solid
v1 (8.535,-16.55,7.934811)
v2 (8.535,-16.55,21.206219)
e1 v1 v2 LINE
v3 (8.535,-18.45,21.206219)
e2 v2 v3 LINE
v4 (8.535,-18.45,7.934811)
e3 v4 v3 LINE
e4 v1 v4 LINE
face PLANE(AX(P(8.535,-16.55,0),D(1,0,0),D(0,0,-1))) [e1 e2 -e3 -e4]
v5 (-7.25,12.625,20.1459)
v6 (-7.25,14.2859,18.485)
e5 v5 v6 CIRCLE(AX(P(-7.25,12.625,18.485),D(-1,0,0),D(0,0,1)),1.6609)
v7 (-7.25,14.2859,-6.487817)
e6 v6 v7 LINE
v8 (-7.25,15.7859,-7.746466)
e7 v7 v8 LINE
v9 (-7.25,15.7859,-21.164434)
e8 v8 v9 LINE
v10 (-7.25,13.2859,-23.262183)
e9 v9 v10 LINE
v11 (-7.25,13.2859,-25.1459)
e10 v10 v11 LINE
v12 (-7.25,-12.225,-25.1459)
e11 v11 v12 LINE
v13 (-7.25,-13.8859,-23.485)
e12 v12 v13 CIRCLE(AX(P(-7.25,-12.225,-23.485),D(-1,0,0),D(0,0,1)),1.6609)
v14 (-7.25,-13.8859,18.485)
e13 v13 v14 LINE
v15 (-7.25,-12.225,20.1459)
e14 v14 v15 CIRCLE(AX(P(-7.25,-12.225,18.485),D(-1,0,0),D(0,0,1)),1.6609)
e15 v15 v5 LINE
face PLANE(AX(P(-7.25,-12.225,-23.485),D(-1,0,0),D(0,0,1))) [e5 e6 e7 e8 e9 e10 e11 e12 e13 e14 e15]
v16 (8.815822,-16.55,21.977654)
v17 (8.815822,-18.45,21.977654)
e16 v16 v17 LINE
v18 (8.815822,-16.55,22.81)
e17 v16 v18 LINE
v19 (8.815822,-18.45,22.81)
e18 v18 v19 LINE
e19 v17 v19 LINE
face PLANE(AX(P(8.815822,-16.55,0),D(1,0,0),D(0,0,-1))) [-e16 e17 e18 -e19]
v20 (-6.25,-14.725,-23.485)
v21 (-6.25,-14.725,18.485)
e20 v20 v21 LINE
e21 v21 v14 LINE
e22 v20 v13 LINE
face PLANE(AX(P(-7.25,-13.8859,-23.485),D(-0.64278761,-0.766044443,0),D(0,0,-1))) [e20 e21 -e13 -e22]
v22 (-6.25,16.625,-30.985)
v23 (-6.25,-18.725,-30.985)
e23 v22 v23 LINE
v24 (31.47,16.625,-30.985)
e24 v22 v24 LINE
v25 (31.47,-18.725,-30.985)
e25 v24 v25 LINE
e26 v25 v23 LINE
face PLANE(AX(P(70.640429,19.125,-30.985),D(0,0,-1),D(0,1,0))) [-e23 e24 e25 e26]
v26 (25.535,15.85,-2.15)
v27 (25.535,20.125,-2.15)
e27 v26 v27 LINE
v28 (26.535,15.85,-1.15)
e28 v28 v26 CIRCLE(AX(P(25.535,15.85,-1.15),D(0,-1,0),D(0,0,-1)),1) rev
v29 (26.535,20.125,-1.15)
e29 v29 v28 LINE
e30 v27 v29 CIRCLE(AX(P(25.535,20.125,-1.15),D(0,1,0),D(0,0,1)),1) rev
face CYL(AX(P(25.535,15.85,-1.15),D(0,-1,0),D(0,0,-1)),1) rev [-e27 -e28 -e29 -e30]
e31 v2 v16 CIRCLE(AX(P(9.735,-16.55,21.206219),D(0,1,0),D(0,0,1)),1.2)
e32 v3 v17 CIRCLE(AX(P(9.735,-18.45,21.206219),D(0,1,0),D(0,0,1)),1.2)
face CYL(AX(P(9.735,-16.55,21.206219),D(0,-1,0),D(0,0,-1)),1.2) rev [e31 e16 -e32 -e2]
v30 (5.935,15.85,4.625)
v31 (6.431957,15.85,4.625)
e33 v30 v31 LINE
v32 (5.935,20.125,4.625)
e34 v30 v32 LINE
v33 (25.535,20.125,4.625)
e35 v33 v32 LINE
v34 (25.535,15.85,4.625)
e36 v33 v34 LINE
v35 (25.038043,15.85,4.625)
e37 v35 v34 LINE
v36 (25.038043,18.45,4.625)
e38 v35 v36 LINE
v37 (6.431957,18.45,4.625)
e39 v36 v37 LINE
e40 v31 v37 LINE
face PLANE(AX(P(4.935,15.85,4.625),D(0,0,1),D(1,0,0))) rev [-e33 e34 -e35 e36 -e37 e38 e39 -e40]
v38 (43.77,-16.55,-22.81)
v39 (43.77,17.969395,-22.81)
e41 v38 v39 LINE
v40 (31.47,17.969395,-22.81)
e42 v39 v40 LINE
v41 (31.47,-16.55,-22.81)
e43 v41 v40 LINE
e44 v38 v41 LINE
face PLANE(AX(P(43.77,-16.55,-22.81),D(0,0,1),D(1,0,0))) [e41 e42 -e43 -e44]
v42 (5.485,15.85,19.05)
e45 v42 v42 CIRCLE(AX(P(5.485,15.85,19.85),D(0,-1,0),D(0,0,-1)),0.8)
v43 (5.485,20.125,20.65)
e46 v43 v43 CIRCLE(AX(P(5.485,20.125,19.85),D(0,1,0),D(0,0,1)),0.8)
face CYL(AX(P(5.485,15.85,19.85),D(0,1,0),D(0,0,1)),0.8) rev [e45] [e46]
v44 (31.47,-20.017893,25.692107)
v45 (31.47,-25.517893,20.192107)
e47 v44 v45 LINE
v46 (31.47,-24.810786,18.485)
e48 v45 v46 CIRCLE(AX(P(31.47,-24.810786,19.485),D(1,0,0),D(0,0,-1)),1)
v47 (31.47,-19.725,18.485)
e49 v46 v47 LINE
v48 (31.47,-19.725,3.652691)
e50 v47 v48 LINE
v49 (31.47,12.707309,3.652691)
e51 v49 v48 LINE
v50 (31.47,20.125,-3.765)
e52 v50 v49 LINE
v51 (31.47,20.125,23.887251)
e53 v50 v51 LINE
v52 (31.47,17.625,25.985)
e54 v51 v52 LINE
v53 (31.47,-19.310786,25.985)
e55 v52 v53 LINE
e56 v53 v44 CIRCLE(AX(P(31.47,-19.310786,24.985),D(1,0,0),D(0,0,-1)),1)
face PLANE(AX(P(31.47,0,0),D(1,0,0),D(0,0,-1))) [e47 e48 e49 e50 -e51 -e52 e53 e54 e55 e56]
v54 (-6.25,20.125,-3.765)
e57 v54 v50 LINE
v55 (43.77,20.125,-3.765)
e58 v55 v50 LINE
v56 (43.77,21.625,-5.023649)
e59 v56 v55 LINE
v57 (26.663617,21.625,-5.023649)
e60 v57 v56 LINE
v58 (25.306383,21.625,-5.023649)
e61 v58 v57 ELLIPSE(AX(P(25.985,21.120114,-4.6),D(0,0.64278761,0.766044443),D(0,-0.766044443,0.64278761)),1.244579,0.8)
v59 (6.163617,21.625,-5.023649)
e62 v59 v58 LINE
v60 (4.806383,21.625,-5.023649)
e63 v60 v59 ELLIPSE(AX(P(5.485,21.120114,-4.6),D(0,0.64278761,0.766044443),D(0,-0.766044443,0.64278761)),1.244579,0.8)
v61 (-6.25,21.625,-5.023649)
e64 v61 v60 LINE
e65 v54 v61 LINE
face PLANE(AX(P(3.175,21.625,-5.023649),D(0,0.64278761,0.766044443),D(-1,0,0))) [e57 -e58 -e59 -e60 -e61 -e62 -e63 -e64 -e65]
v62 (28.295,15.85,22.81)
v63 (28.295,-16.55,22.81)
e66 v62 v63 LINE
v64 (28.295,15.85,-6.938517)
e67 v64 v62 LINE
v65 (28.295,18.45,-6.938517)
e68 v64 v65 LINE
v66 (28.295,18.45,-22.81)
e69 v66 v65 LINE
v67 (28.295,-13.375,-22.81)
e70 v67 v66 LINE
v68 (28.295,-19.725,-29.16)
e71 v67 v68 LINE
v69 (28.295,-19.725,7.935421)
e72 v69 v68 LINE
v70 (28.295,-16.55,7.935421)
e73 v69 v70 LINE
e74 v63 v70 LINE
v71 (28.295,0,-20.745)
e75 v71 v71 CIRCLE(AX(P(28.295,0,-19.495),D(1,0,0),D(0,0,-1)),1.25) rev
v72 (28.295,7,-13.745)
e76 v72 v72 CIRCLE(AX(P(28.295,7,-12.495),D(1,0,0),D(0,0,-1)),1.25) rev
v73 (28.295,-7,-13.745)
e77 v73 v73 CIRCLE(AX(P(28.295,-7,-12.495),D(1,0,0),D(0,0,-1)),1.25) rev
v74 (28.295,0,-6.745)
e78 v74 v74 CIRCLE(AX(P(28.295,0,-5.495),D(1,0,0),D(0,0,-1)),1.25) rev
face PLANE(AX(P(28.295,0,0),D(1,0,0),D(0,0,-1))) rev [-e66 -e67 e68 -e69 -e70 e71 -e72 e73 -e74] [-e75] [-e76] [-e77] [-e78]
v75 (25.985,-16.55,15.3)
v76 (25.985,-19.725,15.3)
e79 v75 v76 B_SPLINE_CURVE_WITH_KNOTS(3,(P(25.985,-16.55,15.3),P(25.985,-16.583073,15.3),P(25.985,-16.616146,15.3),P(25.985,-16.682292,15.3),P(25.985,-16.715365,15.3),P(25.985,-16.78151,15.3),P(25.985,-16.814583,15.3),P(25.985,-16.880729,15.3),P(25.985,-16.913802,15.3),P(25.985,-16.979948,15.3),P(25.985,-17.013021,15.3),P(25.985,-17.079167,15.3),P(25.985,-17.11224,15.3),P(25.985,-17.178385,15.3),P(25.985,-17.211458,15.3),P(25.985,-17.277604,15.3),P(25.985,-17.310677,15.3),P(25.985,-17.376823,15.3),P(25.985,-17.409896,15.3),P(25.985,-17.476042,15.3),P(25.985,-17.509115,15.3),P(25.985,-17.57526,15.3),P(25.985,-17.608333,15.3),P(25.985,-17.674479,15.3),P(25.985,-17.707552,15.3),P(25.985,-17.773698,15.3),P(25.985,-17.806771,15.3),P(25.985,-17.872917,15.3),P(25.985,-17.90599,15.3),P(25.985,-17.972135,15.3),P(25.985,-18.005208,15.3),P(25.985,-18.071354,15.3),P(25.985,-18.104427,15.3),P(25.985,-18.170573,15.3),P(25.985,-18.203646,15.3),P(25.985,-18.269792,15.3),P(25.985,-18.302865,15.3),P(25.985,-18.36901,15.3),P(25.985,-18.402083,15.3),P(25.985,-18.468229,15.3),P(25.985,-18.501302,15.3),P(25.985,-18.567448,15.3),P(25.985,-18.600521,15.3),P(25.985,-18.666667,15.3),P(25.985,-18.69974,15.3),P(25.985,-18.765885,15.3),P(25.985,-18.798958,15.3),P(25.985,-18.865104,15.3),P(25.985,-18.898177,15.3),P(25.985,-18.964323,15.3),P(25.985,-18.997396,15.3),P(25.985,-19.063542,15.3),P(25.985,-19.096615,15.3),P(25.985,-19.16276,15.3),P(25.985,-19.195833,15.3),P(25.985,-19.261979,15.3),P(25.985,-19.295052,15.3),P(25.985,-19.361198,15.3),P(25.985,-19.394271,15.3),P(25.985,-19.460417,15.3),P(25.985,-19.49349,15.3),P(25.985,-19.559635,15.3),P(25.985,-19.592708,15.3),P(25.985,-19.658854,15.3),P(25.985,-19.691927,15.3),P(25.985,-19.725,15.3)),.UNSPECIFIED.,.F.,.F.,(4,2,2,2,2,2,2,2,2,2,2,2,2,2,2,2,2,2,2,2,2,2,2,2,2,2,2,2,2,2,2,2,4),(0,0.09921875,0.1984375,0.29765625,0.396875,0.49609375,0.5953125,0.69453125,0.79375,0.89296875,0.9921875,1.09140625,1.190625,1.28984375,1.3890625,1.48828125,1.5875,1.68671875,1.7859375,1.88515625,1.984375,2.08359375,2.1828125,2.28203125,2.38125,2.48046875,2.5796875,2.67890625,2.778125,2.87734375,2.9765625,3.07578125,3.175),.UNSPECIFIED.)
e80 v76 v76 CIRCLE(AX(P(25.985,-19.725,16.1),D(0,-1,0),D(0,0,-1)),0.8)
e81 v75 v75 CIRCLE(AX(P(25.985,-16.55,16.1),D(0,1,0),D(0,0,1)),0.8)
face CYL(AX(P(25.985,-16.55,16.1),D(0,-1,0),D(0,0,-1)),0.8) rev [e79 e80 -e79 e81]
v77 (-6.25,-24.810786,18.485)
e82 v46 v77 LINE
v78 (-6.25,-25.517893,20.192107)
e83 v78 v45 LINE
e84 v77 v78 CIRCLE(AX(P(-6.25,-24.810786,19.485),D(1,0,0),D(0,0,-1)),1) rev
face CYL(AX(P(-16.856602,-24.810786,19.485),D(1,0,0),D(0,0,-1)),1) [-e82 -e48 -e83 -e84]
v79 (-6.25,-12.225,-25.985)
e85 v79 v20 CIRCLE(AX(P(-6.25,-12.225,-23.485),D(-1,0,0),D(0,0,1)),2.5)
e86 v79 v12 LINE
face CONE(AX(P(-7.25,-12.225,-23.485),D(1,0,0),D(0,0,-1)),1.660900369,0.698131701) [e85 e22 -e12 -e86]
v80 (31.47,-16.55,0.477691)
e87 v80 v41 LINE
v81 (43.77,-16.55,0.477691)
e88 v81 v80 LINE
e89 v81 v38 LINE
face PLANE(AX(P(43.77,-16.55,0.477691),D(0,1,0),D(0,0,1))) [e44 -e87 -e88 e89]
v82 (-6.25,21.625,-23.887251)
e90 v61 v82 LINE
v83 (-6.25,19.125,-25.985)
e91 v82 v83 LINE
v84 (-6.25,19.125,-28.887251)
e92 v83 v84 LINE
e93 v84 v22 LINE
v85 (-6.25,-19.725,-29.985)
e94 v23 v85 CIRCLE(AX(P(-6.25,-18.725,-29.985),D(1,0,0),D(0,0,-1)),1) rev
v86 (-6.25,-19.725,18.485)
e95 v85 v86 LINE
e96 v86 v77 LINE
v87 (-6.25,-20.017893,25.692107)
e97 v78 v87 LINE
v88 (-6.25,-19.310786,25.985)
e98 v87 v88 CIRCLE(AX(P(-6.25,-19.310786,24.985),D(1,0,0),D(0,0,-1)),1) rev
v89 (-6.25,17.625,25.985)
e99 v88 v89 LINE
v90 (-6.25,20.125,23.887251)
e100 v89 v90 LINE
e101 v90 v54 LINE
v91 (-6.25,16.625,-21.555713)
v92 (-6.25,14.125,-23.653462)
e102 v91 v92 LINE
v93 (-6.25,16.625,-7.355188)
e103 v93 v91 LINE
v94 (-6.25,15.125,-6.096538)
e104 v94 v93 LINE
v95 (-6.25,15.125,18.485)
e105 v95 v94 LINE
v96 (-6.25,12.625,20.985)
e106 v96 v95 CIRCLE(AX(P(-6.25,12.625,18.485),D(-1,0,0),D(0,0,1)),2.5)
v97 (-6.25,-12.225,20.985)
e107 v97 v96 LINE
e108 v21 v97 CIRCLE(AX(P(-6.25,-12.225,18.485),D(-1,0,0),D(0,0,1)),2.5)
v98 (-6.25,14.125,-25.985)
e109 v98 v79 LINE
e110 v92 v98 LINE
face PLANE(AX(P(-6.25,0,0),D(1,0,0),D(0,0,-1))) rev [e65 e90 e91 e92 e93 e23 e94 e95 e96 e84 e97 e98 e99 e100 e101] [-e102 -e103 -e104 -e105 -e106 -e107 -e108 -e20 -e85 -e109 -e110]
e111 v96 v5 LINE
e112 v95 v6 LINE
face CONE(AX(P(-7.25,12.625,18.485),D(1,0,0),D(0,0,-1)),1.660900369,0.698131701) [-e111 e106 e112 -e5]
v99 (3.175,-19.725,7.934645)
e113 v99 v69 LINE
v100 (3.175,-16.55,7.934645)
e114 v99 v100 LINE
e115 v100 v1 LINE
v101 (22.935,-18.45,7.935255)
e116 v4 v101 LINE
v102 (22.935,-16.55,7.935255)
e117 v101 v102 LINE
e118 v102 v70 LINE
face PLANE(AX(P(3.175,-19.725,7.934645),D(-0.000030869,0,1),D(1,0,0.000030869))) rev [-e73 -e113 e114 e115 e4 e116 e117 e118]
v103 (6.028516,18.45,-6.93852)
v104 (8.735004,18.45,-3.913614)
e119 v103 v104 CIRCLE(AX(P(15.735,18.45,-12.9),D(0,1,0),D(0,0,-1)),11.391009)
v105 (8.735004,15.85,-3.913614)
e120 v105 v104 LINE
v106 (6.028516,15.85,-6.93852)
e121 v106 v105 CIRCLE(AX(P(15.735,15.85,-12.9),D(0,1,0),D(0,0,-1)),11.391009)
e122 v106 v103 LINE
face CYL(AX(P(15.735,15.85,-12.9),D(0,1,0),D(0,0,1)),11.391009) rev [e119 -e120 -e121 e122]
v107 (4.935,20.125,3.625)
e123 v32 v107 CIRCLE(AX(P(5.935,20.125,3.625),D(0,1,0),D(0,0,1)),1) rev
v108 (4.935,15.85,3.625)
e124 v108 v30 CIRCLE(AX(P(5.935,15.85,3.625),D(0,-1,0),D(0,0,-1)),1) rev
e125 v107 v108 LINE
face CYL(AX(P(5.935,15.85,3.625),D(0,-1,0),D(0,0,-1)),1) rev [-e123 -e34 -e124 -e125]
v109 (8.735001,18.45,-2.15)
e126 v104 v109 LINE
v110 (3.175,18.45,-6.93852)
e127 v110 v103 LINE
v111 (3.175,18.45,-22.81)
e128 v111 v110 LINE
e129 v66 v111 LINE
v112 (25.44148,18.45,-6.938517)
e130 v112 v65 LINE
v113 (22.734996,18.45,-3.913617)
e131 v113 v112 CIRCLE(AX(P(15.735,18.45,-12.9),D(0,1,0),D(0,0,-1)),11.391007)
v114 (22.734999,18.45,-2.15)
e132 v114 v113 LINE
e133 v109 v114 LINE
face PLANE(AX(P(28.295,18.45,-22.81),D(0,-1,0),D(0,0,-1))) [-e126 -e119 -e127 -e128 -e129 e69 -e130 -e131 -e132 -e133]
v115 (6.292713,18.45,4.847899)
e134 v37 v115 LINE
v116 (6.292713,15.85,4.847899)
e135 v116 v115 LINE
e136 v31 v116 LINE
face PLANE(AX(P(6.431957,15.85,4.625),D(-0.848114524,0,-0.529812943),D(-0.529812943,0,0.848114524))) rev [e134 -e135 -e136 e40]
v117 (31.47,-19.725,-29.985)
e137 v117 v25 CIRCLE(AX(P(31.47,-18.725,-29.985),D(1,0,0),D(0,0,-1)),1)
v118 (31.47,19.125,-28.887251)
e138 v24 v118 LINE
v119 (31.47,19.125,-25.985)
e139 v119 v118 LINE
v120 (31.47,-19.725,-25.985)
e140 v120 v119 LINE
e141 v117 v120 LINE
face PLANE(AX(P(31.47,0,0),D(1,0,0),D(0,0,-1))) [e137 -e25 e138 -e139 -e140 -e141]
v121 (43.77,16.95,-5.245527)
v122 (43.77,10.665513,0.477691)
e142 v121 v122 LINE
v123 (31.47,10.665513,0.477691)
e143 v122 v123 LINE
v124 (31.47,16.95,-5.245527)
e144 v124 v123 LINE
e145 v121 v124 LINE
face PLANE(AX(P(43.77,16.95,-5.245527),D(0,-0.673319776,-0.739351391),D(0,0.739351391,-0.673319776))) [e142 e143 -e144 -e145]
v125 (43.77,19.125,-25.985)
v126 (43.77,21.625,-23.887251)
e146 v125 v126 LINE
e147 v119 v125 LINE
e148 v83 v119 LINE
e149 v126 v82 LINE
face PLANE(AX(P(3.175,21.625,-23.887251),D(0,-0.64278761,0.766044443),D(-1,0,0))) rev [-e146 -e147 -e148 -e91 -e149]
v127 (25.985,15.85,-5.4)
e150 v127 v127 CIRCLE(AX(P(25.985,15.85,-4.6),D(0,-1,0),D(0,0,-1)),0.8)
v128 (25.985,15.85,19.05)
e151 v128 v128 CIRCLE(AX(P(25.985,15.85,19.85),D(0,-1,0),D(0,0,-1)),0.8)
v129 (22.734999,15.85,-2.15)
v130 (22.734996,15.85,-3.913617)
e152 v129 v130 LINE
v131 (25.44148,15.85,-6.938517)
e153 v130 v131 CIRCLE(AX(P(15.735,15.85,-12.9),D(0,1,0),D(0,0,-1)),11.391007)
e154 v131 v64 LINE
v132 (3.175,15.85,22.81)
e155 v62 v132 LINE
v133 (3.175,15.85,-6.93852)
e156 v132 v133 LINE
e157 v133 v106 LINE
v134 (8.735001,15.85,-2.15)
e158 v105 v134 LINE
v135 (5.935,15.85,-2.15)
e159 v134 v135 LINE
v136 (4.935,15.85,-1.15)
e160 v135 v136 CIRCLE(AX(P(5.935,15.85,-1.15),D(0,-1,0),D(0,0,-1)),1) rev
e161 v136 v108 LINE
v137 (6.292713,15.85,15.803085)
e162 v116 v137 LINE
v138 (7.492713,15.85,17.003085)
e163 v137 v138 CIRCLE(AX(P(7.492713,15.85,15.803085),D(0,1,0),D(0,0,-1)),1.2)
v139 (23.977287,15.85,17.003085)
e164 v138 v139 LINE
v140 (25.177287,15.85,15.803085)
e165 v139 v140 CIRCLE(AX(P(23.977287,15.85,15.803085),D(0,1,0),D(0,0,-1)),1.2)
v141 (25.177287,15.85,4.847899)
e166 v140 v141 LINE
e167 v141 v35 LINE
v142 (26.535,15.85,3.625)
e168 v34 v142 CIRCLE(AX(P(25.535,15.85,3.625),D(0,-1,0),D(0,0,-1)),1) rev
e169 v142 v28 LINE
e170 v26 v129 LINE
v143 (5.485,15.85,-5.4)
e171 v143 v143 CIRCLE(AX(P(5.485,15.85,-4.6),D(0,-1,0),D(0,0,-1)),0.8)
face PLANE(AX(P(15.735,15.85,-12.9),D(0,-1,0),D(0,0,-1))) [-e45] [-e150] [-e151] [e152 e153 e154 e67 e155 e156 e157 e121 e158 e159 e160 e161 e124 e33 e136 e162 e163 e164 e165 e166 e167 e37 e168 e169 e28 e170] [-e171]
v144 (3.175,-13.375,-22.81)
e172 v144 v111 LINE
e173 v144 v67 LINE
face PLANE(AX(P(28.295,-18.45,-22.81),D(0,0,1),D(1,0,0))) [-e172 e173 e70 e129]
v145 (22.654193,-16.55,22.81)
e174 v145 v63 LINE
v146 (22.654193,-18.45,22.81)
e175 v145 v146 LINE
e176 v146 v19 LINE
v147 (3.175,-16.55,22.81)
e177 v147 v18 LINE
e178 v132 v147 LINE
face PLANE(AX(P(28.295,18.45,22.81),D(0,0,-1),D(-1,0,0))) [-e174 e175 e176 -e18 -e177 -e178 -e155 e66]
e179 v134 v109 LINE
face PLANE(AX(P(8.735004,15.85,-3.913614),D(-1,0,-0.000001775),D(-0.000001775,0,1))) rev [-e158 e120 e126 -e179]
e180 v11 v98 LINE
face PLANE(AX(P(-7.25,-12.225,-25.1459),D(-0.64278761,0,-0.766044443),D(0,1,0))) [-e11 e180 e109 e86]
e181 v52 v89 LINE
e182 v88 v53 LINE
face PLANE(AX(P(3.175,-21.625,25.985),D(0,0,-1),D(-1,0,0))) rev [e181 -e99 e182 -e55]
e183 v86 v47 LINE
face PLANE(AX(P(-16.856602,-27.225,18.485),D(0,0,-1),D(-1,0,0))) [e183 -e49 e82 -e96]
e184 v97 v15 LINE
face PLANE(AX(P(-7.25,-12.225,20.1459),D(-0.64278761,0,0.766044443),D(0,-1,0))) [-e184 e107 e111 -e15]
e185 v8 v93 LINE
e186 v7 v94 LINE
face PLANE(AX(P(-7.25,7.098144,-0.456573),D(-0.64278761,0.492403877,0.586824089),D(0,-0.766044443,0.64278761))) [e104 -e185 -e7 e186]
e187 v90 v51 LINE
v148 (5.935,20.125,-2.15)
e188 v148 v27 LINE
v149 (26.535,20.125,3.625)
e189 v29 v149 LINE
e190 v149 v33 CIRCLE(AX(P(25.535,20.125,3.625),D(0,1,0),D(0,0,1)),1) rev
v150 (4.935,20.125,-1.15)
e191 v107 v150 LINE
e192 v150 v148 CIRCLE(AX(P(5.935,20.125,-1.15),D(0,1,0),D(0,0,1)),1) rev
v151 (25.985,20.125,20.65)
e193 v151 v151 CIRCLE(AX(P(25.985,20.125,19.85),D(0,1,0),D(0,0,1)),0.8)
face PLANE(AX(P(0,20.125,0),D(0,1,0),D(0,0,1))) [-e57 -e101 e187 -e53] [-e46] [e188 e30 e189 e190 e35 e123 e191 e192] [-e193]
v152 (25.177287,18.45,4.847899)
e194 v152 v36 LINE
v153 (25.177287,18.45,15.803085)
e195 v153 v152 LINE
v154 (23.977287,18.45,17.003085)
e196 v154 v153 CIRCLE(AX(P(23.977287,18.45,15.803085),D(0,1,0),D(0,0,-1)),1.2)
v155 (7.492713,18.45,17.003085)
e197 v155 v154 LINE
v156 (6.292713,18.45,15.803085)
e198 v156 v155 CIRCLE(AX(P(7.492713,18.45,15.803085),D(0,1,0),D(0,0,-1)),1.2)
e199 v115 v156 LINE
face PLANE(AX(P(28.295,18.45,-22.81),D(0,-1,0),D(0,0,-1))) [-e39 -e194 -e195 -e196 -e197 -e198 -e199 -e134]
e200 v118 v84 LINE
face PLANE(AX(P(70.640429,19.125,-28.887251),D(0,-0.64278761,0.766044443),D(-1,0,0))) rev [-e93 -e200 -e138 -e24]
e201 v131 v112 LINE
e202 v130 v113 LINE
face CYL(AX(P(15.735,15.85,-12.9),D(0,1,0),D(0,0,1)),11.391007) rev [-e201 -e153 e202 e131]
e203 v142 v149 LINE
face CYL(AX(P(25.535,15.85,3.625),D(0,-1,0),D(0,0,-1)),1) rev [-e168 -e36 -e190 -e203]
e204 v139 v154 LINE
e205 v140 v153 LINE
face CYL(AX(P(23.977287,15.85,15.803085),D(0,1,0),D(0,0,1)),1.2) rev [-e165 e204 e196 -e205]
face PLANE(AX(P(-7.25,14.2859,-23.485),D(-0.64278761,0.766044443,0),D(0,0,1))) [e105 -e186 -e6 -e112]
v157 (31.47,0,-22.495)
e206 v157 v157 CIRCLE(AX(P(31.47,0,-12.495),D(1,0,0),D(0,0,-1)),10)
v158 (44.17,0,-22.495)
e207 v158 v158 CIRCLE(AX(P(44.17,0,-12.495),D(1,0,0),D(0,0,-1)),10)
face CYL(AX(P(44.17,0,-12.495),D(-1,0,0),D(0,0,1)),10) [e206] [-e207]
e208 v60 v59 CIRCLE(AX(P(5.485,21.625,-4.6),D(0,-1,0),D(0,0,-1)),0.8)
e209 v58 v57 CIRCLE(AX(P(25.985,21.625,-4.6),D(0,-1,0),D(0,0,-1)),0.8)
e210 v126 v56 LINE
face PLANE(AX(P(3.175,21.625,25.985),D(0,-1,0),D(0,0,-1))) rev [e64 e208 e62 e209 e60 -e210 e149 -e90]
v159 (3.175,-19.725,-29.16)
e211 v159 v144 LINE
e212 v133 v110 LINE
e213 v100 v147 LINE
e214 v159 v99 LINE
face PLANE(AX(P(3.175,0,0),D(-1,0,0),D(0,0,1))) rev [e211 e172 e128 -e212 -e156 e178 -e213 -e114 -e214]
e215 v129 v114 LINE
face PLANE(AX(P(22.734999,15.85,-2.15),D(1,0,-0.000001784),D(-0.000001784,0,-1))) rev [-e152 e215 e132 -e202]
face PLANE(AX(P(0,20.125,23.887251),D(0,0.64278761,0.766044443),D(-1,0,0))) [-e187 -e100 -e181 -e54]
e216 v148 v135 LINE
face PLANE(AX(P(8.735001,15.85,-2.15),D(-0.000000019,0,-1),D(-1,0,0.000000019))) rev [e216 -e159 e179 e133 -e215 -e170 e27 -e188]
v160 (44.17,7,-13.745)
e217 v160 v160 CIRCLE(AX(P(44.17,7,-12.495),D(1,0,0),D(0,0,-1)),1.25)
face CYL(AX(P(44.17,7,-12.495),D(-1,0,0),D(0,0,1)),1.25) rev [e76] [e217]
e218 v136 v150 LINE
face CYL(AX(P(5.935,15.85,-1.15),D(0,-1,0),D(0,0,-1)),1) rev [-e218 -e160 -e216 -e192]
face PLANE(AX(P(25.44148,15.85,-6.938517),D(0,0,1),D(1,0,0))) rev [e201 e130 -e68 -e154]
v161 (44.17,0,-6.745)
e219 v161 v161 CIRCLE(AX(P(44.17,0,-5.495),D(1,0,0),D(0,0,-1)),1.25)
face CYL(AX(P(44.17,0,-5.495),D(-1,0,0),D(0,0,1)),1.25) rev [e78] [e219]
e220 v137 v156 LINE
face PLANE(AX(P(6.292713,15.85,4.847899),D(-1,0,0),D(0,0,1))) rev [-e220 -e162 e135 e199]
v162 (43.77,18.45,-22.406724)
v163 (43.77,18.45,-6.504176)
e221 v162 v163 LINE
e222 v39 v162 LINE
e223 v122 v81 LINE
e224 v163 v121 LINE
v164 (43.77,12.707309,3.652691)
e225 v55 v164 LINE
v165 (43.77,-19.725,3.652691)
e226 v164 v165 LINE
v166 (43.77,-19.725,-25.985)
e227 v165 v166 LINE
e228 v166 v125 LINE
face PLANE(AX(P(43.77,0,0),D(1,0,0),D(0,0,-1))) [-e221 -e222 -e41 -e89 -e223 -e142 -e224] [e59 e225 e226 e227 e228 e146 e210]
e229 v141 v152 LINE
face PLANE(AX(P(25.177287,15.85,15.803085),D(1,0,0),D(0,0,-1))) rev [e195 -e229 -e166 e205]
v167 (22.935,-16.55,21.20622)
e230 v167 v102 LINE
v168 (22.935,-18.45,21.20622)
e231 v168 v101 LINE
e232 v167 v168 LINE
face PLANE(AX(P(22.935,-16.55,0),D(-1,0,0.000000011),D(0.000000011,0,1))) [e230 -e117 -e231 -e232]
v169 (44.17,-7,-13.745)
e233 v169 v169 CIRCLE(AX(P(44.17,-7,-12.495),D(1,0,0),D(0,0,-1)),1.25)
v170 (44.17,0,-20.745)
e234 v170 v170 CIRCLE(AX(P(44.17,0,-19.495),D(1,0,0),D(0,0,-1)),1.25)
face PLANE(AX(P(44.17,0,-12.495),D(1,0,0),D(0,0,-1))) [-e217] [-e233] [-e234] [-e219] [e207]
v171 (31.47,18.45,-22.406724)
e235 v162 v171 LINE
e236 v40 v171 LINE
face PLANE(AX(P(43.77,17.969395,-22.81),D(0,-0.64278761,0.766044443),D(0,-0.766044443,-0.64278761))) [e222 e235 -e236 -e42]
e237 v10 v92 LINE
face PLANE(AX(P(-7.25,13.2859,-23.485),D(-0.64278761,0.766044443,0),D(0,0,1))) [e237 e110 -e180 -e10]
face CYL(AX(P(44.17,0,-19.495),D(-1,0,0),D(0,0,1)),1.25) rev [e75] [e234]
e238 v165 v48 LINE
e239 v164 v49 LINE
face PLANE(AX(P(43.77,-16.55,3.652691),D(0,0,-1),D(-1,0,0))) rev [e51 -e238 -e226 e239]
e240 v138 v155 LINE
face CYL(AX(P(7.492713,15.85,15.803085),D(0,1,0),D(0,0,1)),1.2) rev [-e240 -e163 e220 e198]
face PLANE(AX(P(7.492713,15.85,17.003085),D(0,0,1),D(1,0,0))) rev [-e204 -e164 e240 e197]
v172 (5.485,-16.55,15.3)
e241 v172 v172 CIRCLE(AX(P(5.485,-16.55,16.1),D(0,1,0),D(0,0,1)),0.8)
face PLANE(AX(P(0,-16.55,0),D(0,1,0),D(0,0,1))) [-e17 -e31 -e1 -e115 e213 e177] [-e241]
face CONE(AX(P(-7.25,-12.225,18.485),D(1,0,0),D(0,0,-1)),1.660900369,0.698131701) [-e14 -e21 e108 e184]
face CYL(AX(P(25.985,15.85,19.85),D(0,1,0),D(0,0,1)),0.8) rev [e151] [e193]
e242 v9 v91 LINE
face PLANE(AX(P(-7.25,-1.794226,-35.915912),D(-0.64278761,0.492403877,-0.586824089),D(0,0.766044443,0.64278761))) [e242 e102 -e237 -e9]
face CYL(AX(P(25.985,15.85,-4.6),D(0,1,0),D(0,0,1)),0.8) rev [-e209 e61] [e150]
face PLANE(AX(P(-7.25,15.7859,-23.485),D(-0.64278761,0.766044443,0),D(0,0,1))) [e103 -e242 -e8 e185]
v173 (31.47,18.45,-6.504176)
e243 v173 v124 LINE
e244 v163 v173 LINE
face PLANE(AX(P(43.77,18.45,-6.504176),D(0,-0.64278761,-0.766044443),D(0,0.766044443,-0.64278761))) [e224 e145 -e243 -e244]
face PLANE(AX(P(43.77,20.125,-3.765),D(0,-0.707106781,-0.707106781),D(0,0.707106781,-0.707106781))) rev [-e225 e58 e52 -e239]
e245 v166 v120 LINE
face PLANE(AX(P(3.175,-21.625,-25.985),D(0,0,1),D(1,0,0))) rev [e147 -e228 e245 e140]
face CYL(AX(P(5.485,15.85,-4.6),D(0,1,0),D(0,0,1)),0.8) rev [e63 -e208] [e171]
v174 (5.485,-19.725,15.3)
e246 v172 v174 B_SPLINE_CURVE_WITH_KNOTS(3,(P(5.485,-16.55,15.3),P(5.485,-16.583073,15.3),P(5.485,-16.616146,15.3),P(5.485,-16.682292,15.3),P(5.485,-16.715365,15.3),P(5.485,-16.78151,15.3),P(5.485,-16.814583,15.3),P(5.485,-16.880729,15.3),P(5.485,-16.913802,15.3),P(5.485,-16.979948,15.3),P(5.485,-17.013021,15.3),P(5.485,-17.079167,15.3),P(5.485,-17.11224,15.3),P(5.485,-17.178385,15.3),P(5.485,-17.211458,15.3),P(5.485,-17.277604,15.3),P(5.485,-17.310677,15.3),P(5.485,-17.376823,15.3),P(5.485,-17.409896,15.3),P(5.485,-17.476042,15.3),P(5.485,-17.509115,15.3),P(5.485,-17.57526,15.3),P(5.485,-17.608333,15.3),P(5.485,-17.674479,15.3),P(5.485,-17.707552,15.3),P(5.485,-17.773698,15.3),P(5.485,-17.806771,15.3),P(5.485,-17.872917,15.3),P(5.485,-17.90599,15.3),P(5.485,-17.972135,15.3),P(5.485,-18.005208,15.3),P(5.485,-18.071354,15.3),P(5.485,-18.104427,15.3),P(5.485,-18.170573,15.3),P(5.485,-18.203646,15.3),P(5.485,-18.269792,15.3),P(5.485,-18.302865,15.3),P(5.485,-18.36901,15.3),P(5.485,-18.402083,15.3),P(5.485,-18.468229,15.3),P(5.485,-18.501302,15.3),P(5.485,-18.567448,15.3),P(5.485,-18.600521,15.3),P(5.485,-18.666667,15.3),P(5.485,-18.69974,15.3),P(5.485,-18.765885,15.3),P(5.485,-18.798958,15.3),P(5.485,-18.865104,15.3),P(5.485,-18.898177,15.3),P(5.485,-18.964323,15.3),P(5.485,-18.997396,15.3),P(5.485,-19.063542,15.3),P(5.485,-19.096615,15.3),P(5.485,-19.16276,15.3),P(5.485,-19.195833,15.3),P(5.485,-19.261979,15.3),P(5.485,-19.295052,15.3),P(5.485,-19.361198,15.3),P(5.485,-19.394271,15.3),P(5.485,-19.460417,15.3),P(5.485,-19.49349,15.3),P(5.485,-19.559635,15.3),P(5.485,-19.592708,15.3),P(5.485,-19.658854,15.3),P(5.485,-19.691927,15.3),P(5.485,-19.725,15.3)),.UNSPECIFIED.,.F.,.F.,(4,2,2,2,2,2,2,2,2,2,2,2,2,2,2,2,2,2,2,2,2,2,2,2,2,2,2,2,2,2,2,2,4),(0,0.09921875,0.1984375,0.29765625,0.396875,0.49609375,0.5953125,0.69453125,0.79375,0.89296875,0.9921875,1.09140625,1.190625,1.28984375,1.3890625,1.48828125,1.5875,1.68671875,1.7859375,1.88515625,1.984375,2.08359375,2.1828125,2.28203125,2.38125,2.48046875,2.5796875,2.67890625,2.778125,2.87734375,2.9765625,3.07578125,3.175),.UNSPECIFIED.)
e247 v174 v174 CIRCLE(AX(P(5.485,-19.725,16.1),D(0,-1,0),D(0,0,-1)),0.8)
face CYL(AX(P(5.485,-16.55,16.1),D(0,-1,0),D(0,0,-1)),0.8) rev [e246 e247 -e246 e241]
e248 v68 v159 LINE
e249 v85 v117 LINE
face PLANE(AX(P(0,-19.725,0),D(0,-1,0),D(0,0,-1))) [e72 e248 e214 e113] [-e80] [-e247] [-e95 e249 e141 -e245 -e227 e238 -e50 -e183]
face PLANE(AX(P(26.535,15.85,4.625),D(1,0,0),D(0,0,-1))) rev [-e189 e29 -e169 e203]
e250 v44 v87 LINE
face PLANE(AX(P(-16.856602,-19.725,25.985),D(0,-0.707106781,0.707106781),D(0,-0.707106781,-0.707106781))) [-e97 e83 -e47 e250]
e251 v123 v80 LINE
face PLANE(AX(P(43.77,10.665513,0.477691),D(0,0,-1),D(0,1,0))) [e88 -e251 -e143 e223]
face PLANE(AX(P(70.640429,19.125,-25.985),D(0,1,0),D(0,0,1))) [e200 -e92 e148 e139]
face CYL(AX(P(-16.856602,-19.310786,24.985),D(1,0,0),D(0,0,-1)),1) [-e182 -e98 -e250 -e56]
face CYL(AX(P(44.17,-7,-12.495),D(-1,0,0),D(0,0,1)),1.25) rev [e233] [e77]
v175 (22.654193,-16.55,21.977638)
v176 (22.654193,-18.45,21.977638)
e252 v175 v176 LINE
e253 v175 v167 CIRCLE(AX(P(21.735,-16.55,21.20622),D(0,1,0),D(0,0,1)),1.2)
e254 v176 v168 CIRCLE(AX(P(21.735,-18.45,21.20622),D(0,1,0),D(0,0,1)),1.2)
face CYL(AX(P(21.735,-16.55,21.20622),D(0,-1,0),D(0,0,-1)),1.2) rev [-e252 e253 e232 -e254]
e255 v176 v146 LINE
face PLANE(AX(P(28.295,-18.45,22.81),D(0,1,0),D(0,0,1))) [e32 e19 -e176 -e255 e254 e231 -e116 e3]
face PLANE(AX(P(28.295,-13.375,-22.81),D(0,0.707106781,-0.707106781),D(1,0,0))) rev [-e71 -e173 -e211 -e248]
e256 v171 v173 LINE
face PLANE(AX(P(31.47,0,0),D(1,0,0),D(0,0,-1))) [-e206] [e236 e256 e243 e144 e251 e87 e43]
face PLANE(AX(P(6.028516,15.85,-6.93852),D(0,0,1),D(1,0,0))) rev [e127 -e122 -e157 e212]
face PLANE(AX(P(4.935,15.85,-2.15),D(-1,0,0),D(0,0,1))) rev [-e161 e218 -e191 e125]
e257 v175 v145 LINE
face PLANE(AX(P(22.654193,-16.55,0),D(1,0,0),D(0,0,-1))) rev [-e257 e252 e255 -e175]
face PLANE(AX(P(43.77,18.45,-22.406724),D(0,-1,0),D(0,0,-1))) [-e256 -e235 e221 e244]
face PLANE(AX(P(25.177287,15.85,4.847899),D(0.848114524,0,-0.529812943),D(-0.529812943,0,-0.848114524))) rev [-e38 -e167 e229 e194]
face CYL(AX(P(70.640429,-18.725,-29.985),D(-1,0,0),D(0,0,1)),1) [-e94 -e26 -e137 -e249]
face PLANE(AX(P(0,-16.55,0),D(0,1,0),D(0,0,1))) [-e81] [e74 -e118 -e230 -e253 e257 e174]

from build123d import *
from OCP.BRepFilletAPI import BRepFilletAPI_MakeChamfer
from build123d.topology import SkipClean

# Parameters (mm, degrees)
SKETCH1_W            = 51.97
SKETCH1_H            = 43.25
BOSS_EXTRUDE1_DEPTH  = 3.175
SKETCH2_W            = 51.97
SKETCH2_H            = 43.25
SKETCH2_W_2          = 45.62
SKETCH2_H_2          = 36.9
BOSS_EXTRUDE2_DEPTH  = 25.12
SKETCH5_R            = 0.8
BOSS_EXTRUDE4_DEPTH  = 2.6
CUT_EXTRUDE2_DEPTH   = 56.514258304
FILLET4_R            = 1
SKETCH7_W            = 28.295
SKETCH7_H            = 29.75
CUT_EXTRUDE3_DEPTH   = 1.5
CHAMFER3_SIZE2       = 1.5
CHAMFER3_SIZE        = 1.258649447
CHAMFER4_SIZE        = 2.5
CHAMFER4_SIZE2       = 2.097749078
CHAMFER5_SIZE        = 2.5
CHAMFER5_SIZE2       = 2.097749078
BOSS_EXTRUDE5_START  = 1.9
SKETCH8_R            = 0.8
BOSS_EXTRUDE5_DEPTH  = 1.9
SKETCH9_R            = 0.8
CUT_EXTRUDE4_DEPTH   = 56.514258304
SKETCH10_W           = 28.295
SKETCH10_H           = 32.92
CUT_EXTRUDE5_DEPTH   = 1.9
CHAMFER6_SIZE2       = 1.594289299
CHAMFER6_SIZE        = 1.9
CUT_EXTRUDE6_DEPTH   = 56.514258304
SKETCH12_R           = 0.8
CUT_EXTRUDE7_DEPTH   = 56.514258304
SKETCH13_W           = 28.295
SKETCH13_H           = 33.009615074
CUT_EXTRUDE8_DEPTH   = 1.9
BOSS_EXTRUDE6_DEPTH  = 3.175
SKETCH15_R           = 10
SKETCH15_R_2         = 1.25
BOSS_EXTRUDE7_DEPTH  = 12.7
CUT_EXTRUDE9_START   = -3.175
SKETCH16_R           = 1.25
CUT_EXTRUDE9_DEPTH   = 3.175
BOSS_EXTRUDE8_DEPTH  = 12.3
BOSS_EXTRUDE9_DEPTH  = 6.25
SKETCH19_W           = 5
SKETCH19_H           = 38.85
BOSS_EXTRUDE10_DEPTH = 37.72
CHAMFER7_SIZE        = 2.5
CHAMFER7_SIZE2       = 2.097749078
BOSS_EXTRUDE11_DEPTH = 1
CHAMFER8_SIZE        = 1
CHAMFER8_SIZE_2      = 0.839099631
CUT_EXTRUDE10_DEPTH  = 67.093795095
CHAMFER9_SIZE        = 6.35
BOSS_EXTRUDE12_DEPTH = 37.72
FILLET5_R            = 1
FILLET6_R            = 1


with BuildPart() as part:
    # Sketch1 → Boss-Extrude1 (new body)
    with BuildSketch(Plane(origin=(0, 0, 0), x_dir=(0, 0, -1), z_dir=(1, 0, 0))):
        Rectangle(SKETCH1_W, SKETCH1_H)
    extrude(amount=BOSS_EXTRUDE1_DEPTH)

    # Sketch2 → Boss-Extrude2 (add)
    with BuildSketch(Plane(origin=(3.175, 0, 0), x_dir=(0, 0, -1), z_dir=(1, 0, 0))):
        Rectangle(SKETCH2_W, SKETCH2_H)
        Rectangle(SKETCH2_W_2, SKETCH2_H_2, mode=Mode.SUBTRACT)
    extrude(amount=BOSS_EXTRUDE2_DEPTH)

    # Sketch5 → Boss-Extrude4 (add)
    with BuildSketch(Plane.XZ.offset(-18.45)):
        with BuildLine():
            Line((6.028516065, -6.938519702), (3.175, -6.938519702))
            Line((3.175, -6.938519702), (3.175, 22.81))
            Line((3.175, 22.81), (28.295, 22.81))
            Line((28.295, 22.81), (28.295, -6.938516819))
            Line((28.295, -6.938516819), (25.441479797, -6.938516819))
            ThreePointArc((25.441479797, -6.938516819), (24.224057136, -5.304544733), (22.734996312, -3.913616778))
            Line((22.734996312, -3.913616778), (22.734999457, -2.150000068))
            Line((22.734999457, -2.150000068), (26.535, -2.149999996))
            Line((26.535, -2.149999996), (26.535, 4.625))
            Line((26.535, 4.625), (25.038042913, 4.625))
            Line((25.038042913, 4.625), (25.177286694, 4.847898808))
            Line((25.177286694, 4.847898808), (25.177286694, 15.803085322))
            ThreePointArc((25.177286694, 15.803085322), (24.825814832, 16.651613459), (23.977286696, 17.003085322))
            Line((23.977286696, 17.003085322), (7.492713306, 17.003085322))
            ThreePointArc((7.492713306, 17.003085322), (6.64418517, 16.651613461), (6.292713306, 15.803085325))
            Line((6.292713306, 15.803085325), (6.292713306, 4.847898808))
            Line((6.292713306, 4.847898808), (6.431957087, 4.625))
            Line((6.431957087, 4.625), (4.935, 4.625))
            Line((4.935, 4.625), (4.935, -2.149999996))
            Line((4.935, -2.149999996), (8.73500054, -2.150000068))
            Line((8.73500054, -2.150000068), (8.735003672, -3.913614235))
            ThreePointArc((8.735003672, -3.913614235), (7.245940337, -5.304544533), (6.028516065, -6.938519702))
        make_face()
        with Locations(Location((5.485, -4.6, 0), (0, 0, 270))):
            Circle(SKETCH5_R, mode=Mode.SUBTRACT)
        with Locations(Location((5.485, 19.85, 0), (0, 0, 270))):
            Circle(SKETCH5_R, mode=Mode.SUBTRACT)
        with Locations(Location((25.985, 19.85, 0), (0, 0, 270))):
            Circle(SKETCH5_R, mode=Mode.SUBTRACT)
        with Locations(Location((25.985, -4.6, 0), (0, 0, 270))):
            Circle(SKETCH5_R, mode=Mode.SUBTRACT)
    extrude(amount=BOSS_EXTRUDE4_DEPTH)

    # Sketch6 → Cut-Extrude2 (cut, through all)
    with BuildSketch(Plane.XZ.offset(-18.45)):
        Polygon((6.431957087, 4.625), (4.935, 4.625), (4.935, -2.149999996), (8.73500054, -2.149999996), (22.734999457, -2.149999996), (26.535, -2.149999996), (26.535, 4.625), (25.038042913, 4.625), align=None)
    extrude(amount=-CUT_EXTRUDE2_DEPTH, mode=Mode.SUBTRACT)

    # Fillet4
    fillet4_edges = [part.edges().sort_by_distance(p)[0] for p in [
        (4.935, 20.0375, -2.149999996),
        (4.935, 18.7375, 4.625),
        (26.535, 18.7375, 4.625),
        (26.535, 20.0375, -2.149999996),
    ]]
    fillet(fillet4_edges, radius=FILLET4_R)

    # Sketch7 → Cut-Extrude3 (cut)
    with BuildSketch(Plane(origin=(0, 21.625, 0), x_dir=(1, 0, 0), z_dir=(0, 1, 0))):
        with Locations((14.1475, -11.11)):
            Rectangle(SKETCH7_W, SKETCH7_H)
    extrude(amount=-CUT_EXTRUDE3_DEPTH, mode=Mode.SUBTRACT)

    # Chamfer3
    chamfer3_edges = [part.edges().sort_by_distance(p)[0] for p in [
        (14.1475, 21.625, -3.765),
    ]]
    chamfer3_side = [part.faces().sort_by_distance(p)[0] for p in [
        (14.1475, 21.625, -3.790172989),
    ]]
    chamfer(chamfer3_edges, length=CHAMFER3_SIZE - 0.0001, length2=CHAMFER3_SIZE2 - 0.0001, reference=chamfer3_side[0])  # a hair under: the kernel refuses the full size

    # Chamfer4
    chamfer4_edges = [part.edges().sort_by_distance(p)[0] for p in [
        (14.1475, 20.125, 25.985),
    ]]
    chamfer4_side = [part.faces().sort_by_distance(p)[0] for p in [
        (14.1475, -0.75, 25.985),
    ]]
    chamfer(chamfer4_edges, length=CHAMFER4_SIZE, length2=CHAMFER4_SIZE2, reference=chamfer4_side[0])

    # Chamfer5
    chamfer5_edges = [part.edges().sort_by_distance(p)[0] for p in [
        (14.1475, 21.625, -25.985),
    ]]
    chamfer5_side = [part.faces().sort_by_distance(p)[0] for p in [
        (14.1475, 0, -25.985),
    ]]
    chamfer(chamfer5_edges, length=CHAMFER5_SIZE, length2=CHAMFER5_SIZE2, reference=chamfer5_side[0])

    # Sketch8 → Boss-Extrude5 (add)
    # profile 1 of 2: a face of its own
    with BuildSketch(Plane(origin=(0, -18.45, 0), x_dir=(1, 0, 0), z_dir=(0, 1, 0)).offset(BOSS_EXTRUDE5_START)):
        with BuildLine():
            Line((8.535, -21.20621931), (8.535, 2.277382622))
            ThreePointArc((8.535, 2.277382622), (8.678721463, 2.846834684), (9.07545942, 3.279882607))
            ThreePointArc((9.07545942, 3.279882607), (7.174247423, 4.924433894), (5.668201654, 6.937139072))
            ThreePointArc((5.668201654, 6.937139072), (5.667144466, 6.93892423), (5.666087595, 6.940709575))
            Line((5.666087595, 6.940709575), (3.175, 6.940709575))
            Line((3.175, 6.940709575), (3.175, -22.81))
            Line((3.175, -22.81), (8.815822102, -22.81))
            Line((8.815822102, -22.81), (8.815822102, -21.97765433))
            ThreePointArc((8.815822102, -21.97765433), (8.607388924, -21.616698616), (8.535, -21.20621931))
        make_face()
        with Locations(Location((5.485, -16.1, 0), (0, 0, 90))):
            Circle(SKETCH8_R, mode=Mode.SUBTRACT)
        with Locations(Location((5.485, 4.6, 0), (0, 0, 90))):
            Circle(SKETCH8_R, mode=Mode.SUBTRACT)
    # profile 2 of 2: a face of its own
    with BuildSketch(Plane(origin=(0, -18.45, 0), x_dir=(1, 0, 0), z_dir=(0, 1, 0)).offset(BOSS_EXTRUDE5_START)):
        with BuildLine():
            Line((22.654192711, -21.977637856), (22.654192711, -22.81))
            Line((22.654192711, -22.81), (28.295, -22.81))
            Line((28.295, -22.81), (28.295, 6.939158699))
            Line((28.295, 6.939158699), (25.802994691, 6.939158699))
            ThreePointArc((25.802994691, 6.939158699), (24.296552833, 4.925292532), (22.394540839, 3.279882437))
            ThreePointArc((22.394540839, 3.279882437), (22.791278611, 2.846834547), (22.935, 2.27738262))
            Line((22.935, 2.27738262), (22.935000265, -21.206220073))
            ThreePointArc((22.935000265, -21.206220073), (22.862615212, -21.616688792), (22.654192711, -21.977637856))
        make_face()
        with Locations(Location((25.985, -16.1, 0), (0, 0, 90))):
            Circle(SKETCH8_R, mode=Mode.SUBTRACT)
        with Locations(Location((25.985, 4.6, 0), (0, 0, 90))):
            Circle(SKETCH8_R, mode=Mode.SUBTRACT)
    extrude(amount=-BOSS_EXTRUDE5_DEPTH)

    # Sketch9 → Cut-Extrude4 (cut, through all)
    with SkipClean():  # the faces are left unmerged after this step: merging them gives an invalid solid
        with BuildSketch(Plane.XZ.offset(-18.45)):
            with Locations(Location((5.485, -4.6, 0), (0, 0, 211.975852771))):
                Circle(SKETCH9_R)
            with Locations(Location((25.985, -4.6, 0), (0, 0, 211.975852771))):
                Circle(SKETCH9_R)
            with Locations(Location((25.985, 19.85, 0), (0, 0, 90))):
                Circle(SKETCH9_R)
            with Locations(Location((5.485, 19.85, 0), (0, 0, 90))):
                Circle(SKETCH9_R)
        extrude(amount=-CUT_EXTRUDE4_DEPTH, mode=Mode.SUBTRACT)
    add(part.part.scale(1), mode=Mode.REPLACE)  # the faces are merged on a copy

    # Sketch10 → Cut-Extrude5 (cut)
    with BuildSketch(Plane.XZ.offset(21.625)):
        with Locations((14.1475, 9.525)):
            Rectangle(SKETCH10_W, SKETCH10_H)
    extrude(amount=-CUT_EXTRUDE5_DEPTH, mode=Mode.SUBTRACT)

    # Chamfer6
    chamfer6_edges = [part.edges().sort_by_distance(p)[0] for p in [
        (14.1475, -19.725, -6.935),
    ]]
    chamfer6_side = [part.faces().sort_by_distance(p)[0] for p in [
        (14.1475, -19.756885786, -6.935),
    ]]
    chamfer(chamfer6_edges, length=CHAMFER6_SIZE - 0.0001, length2=CHAMFER6_SIZE2 - 0.0001, reference=chamfer6_side[0])  # a hair under: the kernel refuses the full size

    # Sketch11 → Cut-Extrude6 (cut, through all)
    with BuildSketch(Plane(origin=(0, -18.45, 0), x_dir=(1, 0, 0), z_dir=(0, 1, 0))):
        with BuildLine():
            Line((3.175, 22.81), (3.175, 6.940709575))
            Line((3.175, 6.940709575), (5.666087595, 6.940709575))
            ThreePointArc((5.666087595, 6.940709575), (7.172833315, 4.925952029), (9.07545942, 3.279882607))
            ThreePointArc((9.07545942, 3.279882607), (15.735000094, 0.521410441), (22.394540839, 3.279882437))
            ThreePointArc((22.394540839, 3.279882437), (24.296552833, 4.925292532), (25.802994691, 6.939158699))
            Line((25.802994691, 6.939158699), (28.295, 6.939158699))
            Line((28.295, 6.939158699), (28.295, 22.81))
            Line((28.295, 22.81), (3.175, 22.81))
        make_face()
    extrude(amount=-CUT_EXTRUDE6_DEPTH, mode=Mode.SUBTRACT)

    # Sketch12 → Cut-Extrude7 (cut, through all)
    with BuildSketch(Plane(origin=(0, -18.45, 0), x_dir=(1, 0, 0), z_dir=(0, 1, 0))):
        with Locations(Location((25.985, 4.6, 0), (0, 0, 148.024147229))):
            Circle(SKETCH12_R)
        with Locations(Location((25.985, -16.1, 0), (0, 0, 90))):
            Circle(SKETCH12_R)
        with Locations(Location((5.485, -16.1, 0), (0, 0, 90))):
            Circle(SKETCH12_R)
        with Locations(Location((5.485, 4.6, 0), (0, 0, 148.024147229))):
            Circle(SKETCH12_R)
    extrude(amount=-CUT_EXTRUDE7_DEPTH, mode=Mode.SUBTRACT)

    # Sketch13 → Cut-Extrude8 (cut)
    with BuildSketch(Plane.XZ.offset(21.625)):
        with Locations((14.1475, -9.480192463)):
            Rectangle(SKETCH13_W, SKETCH13_H)
    extrude(amount=-CUT_EXTRUDE8_DEPTH, mode=Mode.SUBTRACT)

    # Sketch14 → Boss-Extrude6 (add)
    with BuildSketch(Plane(origin=(28.295, 0, 0), x_dir=(0, 0, -1), z_dir=(1, 0, 0))):
        Polygon((25.985, -19.725), (25.985, 19.125), (23.887250922, 21.625), (5.023649447, 21.625), (3.765, 20.125), (-23.887250922, 20.125), (-25.985, 17.625), (-25.985, -19.725), align=None)
    extrude(amount=BOSS_EXTRUDE6_DEPTH)

    # Sketch15 → Boss-Extrude7 (add)
    with BuildSketch(Plane(origin=(31.47, 0, 0), x_dir=(0, 0, -1), z_dir=(1, 0, 0))):
        with Locations((12.495, 0)):
            Circle(SKETCH15_R)
        with Locations((12.495, 7)):
            Circle(SKETCH15_R_2, mode=Mode.SUBTRACT)
        with Locations((19.495, 0)):
            Circle(SKETCH15_R_2, mode=Mode.SUBTRACT)
        with Locations((5.495, 0)):
            Circle(SKETCH15_R_2, mode=Mode.SUBTRACT)
        with Locations((12.495, -7)):
            Circle(SKETCH15_R_2, mode=Mode.SUBTRACT)
    extrude(amount=BOSS_EXTRUDE7_DEPTH)

    # Sketch16 → Cut-Extrude9 (cut)
    with BuildSketch(Plane(origin=(31.47, 0, 0), x_dir=(0, 0, -1), z_dir=(1, 0, 0)).offset(CUT_EXTRUDE9_START)):
        with Locations((19.495, 0)):
            Circle(SKETCH16_R)
        with Locations((12.495, -7)):
            Circle(SKETCH16_R)
        with Locations((5.495, 0)):
            Circle(SKETCH16_R)
        with Locations((12.495, 7)):
            Circle(SKETCH16_R)
    extrude(amount=CUT_EXTRUDE9_DEPTH, mode=Mode.SUBTRACT)

    # Sketch17 → Boss-Extrude8 (add)
    with BuildSketch(Plane(origin=(31.47, 0, 0), x_dir=(0, 0, -1), z_dir=(1, 0, 0))):
        Polygon((25.985, -19.725), (25.985, 19.125), (23.887250922, 21.625), (5.023649447, 21.625), (3.765, 20.125), (-3.652691279, 12.707308721), (-3.652691279, 11.672370782), (-3.652691279, -16.55), (-3.652691279, -19.725), align=None)
        Polygon((-0.477691279, -16.55), (22.81, -16.55), (22.81, 17.969394506), (22.406724107, 18.45), (6.504176261, 18.45), (5.245526815, 16.95), (-0.477691279, 10.665513175), align=None, mode=Mode.SUBTRACT)
    extrude(amount=BOSS_EXTRUDE8_DEPTH)

    # Sketch18 → Boss-Extrude9 (add)
    with BuildSketch(Plane.ZY):
        Polygon((-25.985, 19.125), (-25.985, -19.725), (25.985, -19.725), (25.985, 17.625), (23.887250922, 20.125), (-3.765, 20.125), (-5.023649447, 21.625), (-23.887250922, 21.625), align=None)
    extrude(amount=BOSS_EXTRUDE9_DEPTH)

    # Sketch19 → Boss-Extrude10 (add)
    with BuildSketch(Plane.ZY.offset(6.25)):
        with Locations((-28.485, -0.3)):
            Rectangle(SKETCH19_W, SKETCH19_H)
    extrude(amount=-BOSS_EXTRUDE10_DEPTH)

    # Chamfer7
    chamfer7_edges = [part.edges().sort_by_distance(p)[0] for p in [
        (12.61, 19.125, -30.985),
    ]]
    chamfer7_side = [part.faces().sort_by_distance(p)[0] for p in [
        (12.61, -0.3, -30.985),
    ]]
    chamfer(chamfer7_edges, length=CHAMFER7_SIZE, length2=CHAMFER7_SIZE2, reference=chamfer7_side[0])

    # Sketch20 → Boss-Extrude11 (add)
    with BuildSketch(Plane.ZY.offset(6.25)):
        with BuildLine():
            Line((-25.985, 14.125), (-25.985, -12.225))
            ThreePointArc((-25.985, -12.225), (-25.252766953, -13.992766953), (-23.485, -14.725))
            Line((-23.485, -14.725), (18.485, -14.725))
            ThreePointArc((18.485, -14.725), (20.252766953, -13.992766953), (20.985, -12.225))
            Line((20.985, -12.225), (20.985, 12.625))
            ThreePointArc((20.985, 12.625), (20.252766953, 14.392766953), (18.485, 15.125))
            Line((18.485, 15.125), (-6.096538291, 15.125))
            Line((-6.096538291, 15.125), (-7.355187738, 16.625))
            Line((-7.355187738, 16.625), (-21.555712631, 16.625))
            Line((-21.555712631, 16.625), (-23.653461709, 14.125))
            Line((-23.653461709, 14.125), (-25.985, 14.125))
        make_face()
    extrude(amount=BOSS_EXTRUDE11_DEPTH)

    # Chamfer8
    chamfer8_edges_1 = [part.edges().sort_by_distance(p)[0] for p in [
        (-7.25, 0.95, -25.985),
    ]]
    chamfer8_side_1 = [part.faces().sort_by_distance(p)[0] for p in [
        (-7.233218007, 0.95, -25.985),
    ]]
    chamfer8_edges_2 = [part.edges().sort_by_distance(p)[0] for p in [
        (-7.25, 14.125, -24.819230855),
    ]]
    chamfer8_side_2 = [part.faces().sort_by_distance(p)[0] for p in [
        (-7.233218007, 14.125, -24.819230855),
    ]]
    chamfer8_edges_3 = [part.edges().sort_by_distance(p)[0] for p in [
        (-7.25, 15.375, -22.60458717),
    ]]
    chamfer8_side_3 = [part.faces().sort_by_distance(p)[0] for p in [
        (-7.233218007, 15.375, -22.60458717),
    ]]
    chamfer8_edges_4 = [part.edges().sort_by_distance(p)[0] for p in [
        (-7.25, 16.625, -14.455450184),
    ]]
    chamfer8_side_4 = [part.faces().sort_by_distance(p)[0] for p in [
        (-7.233218007, 16.625, -14.455450184),
    ]]
    chamfer8_edges_5 = [part.edges().sort_by_distance(p)[0] for p in [
        (-7.25, 15.875, -6.725863014),
    ]]
    chamfer8_side_5 = [part.faces().sort_by_distance(p)[0] for p in [
        (-7.233218007, 15.875, -6.725863014),
    ]]
    chamfer8_edges_6 = [part.edges().sort_by_distance(p)[0] for p in [
        (-7.25, 15.125, 6.194230855),
    ]]
    chamfer8_side_6 = [part.faces().sort_by_distance(p)[0] for p in [
        (-7.233218007, 15.125, 6.194230855),
    ]]
    chamfer8_edges_7 = [part.edges().sort_by_distance(p)[0] for p in [
        (-7.25, 14.392766953, 20.252766953),
    ]]
    chamfer8_side_7 = [part.faces().sort_by_distance(p)[0] for p in [
        (-7.233218007, 14.392766953, 20.252766953),
    ]]
    chamfer8_edges_8 = [part.edges().sort_by_distance(p)[0] for p in [
        (-7.25, 0.2, 20.985),
    ]]
    chamfer8_side_8 = [part.faces().sort_by_distance(p)[0] for p in [
        (-7.233218007, 0.2, 20.985),
    ]]
    chamfer8_edges_9 = [part.edges().sort_by_distance(p)[0] for p in [
        (-7.25, -13.992766953, 20.252766953),
    ]]
    chamfer8_side_9 = [part.faces().sort_by_distance(p)[0] for p in [
        (-7.233218007, -13.992766953, 20.252766953),
    ]]
    chamfer8_edges_10 = [part.edges().sort_by_distance(p)[0] for p in [
        (-7.25, -14.725, -2.5),
    ]]
    chamfer8_side_10 = [part.faces().sort_by_distance(p)[0] for p in [
        (-7.233218007, -14.725, -2.5),
    ]]
    chamfer8_edges_11 = [part.edges().sort_by_distance(p)[0] for p in [
        (-7.25, -13.992766953, -25.252766953),
    ]]
    chamfer8_side_11 = [part.faces().sort_by_distance(p)[0] for p in [
        (-7.233218007, -13.992766953, -25.252766953),
    ]]
    chamfer8 = BRepFilletAPI_MakeChamfer(part.part.solid().wrapped)
    for e in chamfer8_edges_1:
        chamfer8.Add(CHAMFER8_SIZE - 0.0001, CHAMFER8_SIZE_2 - 0.0001, e.wrapped, chamfer8_side_1[0].wrapped)
    for e in chamfer8_edges_2:
        chamfer8.Add(CHAMFER8_SIZE - 0.0001, CHAMFER8_SIZE_2 - 0.0001, e.wrapped, chamfer8_side_2[0].wrapped)
    for e in chamfer8_edges_3:
        chamfer8.Add(CHAMFER8_SIZE - 0.0001, CHAMFER8_SIZE_2 - 0.0001, e.wrapped, chamfer8_side_3[0].wrapped)
    for e in chamfer8_edges_4:
        chamfer8.Add(CHAMFER8_SIZE - 0.0001, CHAMFER8_SIZE_2 - 0.0001, e.wrapped, chamfer8_side_4[0].wrapped)
    for e in chamfer8_edges_5:
        chamfer8.Add(CHAMFER8_SIZE - 0.0001, CHAMFER8_SIZE_2 - 0.0001, e.wrapped, chamfer8_side_5[0].wrapped)
    for e in chamfer8_edges_6:
        chamfer8.Add(CHAMFER8_SIZE - 0.0001, CHAMFER8_SIZE_2 - 0.0001, e.wrapped, chamfer8_side_6[0].wrapped)
    for e in chamfer8_edges_7:
        chamfer8.Add(CHAMFER8_SIZE - 0.0001, CHAMFER8_SIZE_2 - 0.0001, e.wrapped, chamfer8_side_7[0].wrapped)
    for e in chamfer8_edges_8:
        chamfer8.Add(CHAMFER8_SIZE - 0.0001, CHAMFER8_SIZE_2 - 0.0001, e.wrapped, chamfer8_side_8[0].wrapped)
    for e in chamfer8_edges_9:
        chamfer8.Add(CHAMFER8_SIZE - 0.0001, CHAMFER8_SIZE_2 - 0.0001, e.wrapped, chamfer8_side_9[0].wrapped)
    for e in chamfer8_edges_10:
        chamfer8.Add(CHAMFER8_SIZE - 0.0001, CHAMFER8_SIZE_2 - 0.0001, e.wrapped, chamfer8_side_10[0].wrapped)
    for e in chamfer8_edges_11:
        chamfer8.Add(CHAMFER8_SIZE - 0.0001, CHAMFER8_SIZE_2 - 0.0001, e.wrapped, chamfer8_side_11[0].wrapped)
    add(Compound.cast(chamfer8.Shape()), mode=Mode.REPLACE)  # a hair under: the kernel refuses the full size

    # Sketch21 → Cut-Extrude10 (cut, through all)
    with BuildSketch(Plane(origin=(0, -16.55, 0), x_dir=(1, 0, 0), z_dir=(0, 1, 0))):
        with BuildLine():
            Line((3.175, -7.934645212), (28.295, -7.935420651))
            Line((28.295, -7.935420651), (28.295, 6.939158699))
            Line((28.295, 6.939158699), (25.802994691, 6.939158699))
            ThreePointArc((25.802994691, 6.939158699), (24.296552833, 4.925292532), (22.394540839, 3.279882437))
            ThreePointArc((22.394540839, 3.279882437), (15.735000094, 0.521410441), (9.07545942, 3.279882607))
            ThreePointArc((9.07545942, 3.279882607), (7.172833315, 4.925952029), (5.666087595, 6.940709575))
            Line((5.666087595, 6.940709575), (3.175, 6.940709575))
            Line((3.175, 6.940709575), (3.175, -7.934645212))
        make_face()
    extrude(amount=-CUT_EXTRUDE10_DEPTH, mode=Mode.SUBTRACT)

    # Chamfer9
    chamfer9_edges = [part.edges().sort_by_distance(p)[0] for p in [
        (15.735, -19.725, -22.81),
    ]]
    chamfer(chamfer9_edges, length=CHAMFER9_SIZE)

    # Sketch22 → Boss-Extrude12 (add)
    with BuildSketch(Plane(origin=(31.47, 0, 0), x_dir=(0, 0, -1), z_dir=(1, 0, 0))):
        Polygon((-25.985, -19.725), (-18.485, -27.225), (-18.485, -19.725), align=None)
    extrude(amount=-BOSS_EXTRUDE12_DEPTH)

    # Fillet5
    fillet5_edges = [part.edges().sort_by_distance(p)[0] for p in [
        (12.61, -19.725, 25.985),
        (12.61, -19.725, -30.985),
    ]]
    fillet(fillet5_edges, radius=FILLET5_R)

    # Fillet6
    fillet6_edges = [part.edges().sort_by_distance(p)[0] for p in [
        (12.61, -27.225, 18.485),
    ]]
    fillet(fillet6_edges, radius=FILLET6_R)


solid = part.part
